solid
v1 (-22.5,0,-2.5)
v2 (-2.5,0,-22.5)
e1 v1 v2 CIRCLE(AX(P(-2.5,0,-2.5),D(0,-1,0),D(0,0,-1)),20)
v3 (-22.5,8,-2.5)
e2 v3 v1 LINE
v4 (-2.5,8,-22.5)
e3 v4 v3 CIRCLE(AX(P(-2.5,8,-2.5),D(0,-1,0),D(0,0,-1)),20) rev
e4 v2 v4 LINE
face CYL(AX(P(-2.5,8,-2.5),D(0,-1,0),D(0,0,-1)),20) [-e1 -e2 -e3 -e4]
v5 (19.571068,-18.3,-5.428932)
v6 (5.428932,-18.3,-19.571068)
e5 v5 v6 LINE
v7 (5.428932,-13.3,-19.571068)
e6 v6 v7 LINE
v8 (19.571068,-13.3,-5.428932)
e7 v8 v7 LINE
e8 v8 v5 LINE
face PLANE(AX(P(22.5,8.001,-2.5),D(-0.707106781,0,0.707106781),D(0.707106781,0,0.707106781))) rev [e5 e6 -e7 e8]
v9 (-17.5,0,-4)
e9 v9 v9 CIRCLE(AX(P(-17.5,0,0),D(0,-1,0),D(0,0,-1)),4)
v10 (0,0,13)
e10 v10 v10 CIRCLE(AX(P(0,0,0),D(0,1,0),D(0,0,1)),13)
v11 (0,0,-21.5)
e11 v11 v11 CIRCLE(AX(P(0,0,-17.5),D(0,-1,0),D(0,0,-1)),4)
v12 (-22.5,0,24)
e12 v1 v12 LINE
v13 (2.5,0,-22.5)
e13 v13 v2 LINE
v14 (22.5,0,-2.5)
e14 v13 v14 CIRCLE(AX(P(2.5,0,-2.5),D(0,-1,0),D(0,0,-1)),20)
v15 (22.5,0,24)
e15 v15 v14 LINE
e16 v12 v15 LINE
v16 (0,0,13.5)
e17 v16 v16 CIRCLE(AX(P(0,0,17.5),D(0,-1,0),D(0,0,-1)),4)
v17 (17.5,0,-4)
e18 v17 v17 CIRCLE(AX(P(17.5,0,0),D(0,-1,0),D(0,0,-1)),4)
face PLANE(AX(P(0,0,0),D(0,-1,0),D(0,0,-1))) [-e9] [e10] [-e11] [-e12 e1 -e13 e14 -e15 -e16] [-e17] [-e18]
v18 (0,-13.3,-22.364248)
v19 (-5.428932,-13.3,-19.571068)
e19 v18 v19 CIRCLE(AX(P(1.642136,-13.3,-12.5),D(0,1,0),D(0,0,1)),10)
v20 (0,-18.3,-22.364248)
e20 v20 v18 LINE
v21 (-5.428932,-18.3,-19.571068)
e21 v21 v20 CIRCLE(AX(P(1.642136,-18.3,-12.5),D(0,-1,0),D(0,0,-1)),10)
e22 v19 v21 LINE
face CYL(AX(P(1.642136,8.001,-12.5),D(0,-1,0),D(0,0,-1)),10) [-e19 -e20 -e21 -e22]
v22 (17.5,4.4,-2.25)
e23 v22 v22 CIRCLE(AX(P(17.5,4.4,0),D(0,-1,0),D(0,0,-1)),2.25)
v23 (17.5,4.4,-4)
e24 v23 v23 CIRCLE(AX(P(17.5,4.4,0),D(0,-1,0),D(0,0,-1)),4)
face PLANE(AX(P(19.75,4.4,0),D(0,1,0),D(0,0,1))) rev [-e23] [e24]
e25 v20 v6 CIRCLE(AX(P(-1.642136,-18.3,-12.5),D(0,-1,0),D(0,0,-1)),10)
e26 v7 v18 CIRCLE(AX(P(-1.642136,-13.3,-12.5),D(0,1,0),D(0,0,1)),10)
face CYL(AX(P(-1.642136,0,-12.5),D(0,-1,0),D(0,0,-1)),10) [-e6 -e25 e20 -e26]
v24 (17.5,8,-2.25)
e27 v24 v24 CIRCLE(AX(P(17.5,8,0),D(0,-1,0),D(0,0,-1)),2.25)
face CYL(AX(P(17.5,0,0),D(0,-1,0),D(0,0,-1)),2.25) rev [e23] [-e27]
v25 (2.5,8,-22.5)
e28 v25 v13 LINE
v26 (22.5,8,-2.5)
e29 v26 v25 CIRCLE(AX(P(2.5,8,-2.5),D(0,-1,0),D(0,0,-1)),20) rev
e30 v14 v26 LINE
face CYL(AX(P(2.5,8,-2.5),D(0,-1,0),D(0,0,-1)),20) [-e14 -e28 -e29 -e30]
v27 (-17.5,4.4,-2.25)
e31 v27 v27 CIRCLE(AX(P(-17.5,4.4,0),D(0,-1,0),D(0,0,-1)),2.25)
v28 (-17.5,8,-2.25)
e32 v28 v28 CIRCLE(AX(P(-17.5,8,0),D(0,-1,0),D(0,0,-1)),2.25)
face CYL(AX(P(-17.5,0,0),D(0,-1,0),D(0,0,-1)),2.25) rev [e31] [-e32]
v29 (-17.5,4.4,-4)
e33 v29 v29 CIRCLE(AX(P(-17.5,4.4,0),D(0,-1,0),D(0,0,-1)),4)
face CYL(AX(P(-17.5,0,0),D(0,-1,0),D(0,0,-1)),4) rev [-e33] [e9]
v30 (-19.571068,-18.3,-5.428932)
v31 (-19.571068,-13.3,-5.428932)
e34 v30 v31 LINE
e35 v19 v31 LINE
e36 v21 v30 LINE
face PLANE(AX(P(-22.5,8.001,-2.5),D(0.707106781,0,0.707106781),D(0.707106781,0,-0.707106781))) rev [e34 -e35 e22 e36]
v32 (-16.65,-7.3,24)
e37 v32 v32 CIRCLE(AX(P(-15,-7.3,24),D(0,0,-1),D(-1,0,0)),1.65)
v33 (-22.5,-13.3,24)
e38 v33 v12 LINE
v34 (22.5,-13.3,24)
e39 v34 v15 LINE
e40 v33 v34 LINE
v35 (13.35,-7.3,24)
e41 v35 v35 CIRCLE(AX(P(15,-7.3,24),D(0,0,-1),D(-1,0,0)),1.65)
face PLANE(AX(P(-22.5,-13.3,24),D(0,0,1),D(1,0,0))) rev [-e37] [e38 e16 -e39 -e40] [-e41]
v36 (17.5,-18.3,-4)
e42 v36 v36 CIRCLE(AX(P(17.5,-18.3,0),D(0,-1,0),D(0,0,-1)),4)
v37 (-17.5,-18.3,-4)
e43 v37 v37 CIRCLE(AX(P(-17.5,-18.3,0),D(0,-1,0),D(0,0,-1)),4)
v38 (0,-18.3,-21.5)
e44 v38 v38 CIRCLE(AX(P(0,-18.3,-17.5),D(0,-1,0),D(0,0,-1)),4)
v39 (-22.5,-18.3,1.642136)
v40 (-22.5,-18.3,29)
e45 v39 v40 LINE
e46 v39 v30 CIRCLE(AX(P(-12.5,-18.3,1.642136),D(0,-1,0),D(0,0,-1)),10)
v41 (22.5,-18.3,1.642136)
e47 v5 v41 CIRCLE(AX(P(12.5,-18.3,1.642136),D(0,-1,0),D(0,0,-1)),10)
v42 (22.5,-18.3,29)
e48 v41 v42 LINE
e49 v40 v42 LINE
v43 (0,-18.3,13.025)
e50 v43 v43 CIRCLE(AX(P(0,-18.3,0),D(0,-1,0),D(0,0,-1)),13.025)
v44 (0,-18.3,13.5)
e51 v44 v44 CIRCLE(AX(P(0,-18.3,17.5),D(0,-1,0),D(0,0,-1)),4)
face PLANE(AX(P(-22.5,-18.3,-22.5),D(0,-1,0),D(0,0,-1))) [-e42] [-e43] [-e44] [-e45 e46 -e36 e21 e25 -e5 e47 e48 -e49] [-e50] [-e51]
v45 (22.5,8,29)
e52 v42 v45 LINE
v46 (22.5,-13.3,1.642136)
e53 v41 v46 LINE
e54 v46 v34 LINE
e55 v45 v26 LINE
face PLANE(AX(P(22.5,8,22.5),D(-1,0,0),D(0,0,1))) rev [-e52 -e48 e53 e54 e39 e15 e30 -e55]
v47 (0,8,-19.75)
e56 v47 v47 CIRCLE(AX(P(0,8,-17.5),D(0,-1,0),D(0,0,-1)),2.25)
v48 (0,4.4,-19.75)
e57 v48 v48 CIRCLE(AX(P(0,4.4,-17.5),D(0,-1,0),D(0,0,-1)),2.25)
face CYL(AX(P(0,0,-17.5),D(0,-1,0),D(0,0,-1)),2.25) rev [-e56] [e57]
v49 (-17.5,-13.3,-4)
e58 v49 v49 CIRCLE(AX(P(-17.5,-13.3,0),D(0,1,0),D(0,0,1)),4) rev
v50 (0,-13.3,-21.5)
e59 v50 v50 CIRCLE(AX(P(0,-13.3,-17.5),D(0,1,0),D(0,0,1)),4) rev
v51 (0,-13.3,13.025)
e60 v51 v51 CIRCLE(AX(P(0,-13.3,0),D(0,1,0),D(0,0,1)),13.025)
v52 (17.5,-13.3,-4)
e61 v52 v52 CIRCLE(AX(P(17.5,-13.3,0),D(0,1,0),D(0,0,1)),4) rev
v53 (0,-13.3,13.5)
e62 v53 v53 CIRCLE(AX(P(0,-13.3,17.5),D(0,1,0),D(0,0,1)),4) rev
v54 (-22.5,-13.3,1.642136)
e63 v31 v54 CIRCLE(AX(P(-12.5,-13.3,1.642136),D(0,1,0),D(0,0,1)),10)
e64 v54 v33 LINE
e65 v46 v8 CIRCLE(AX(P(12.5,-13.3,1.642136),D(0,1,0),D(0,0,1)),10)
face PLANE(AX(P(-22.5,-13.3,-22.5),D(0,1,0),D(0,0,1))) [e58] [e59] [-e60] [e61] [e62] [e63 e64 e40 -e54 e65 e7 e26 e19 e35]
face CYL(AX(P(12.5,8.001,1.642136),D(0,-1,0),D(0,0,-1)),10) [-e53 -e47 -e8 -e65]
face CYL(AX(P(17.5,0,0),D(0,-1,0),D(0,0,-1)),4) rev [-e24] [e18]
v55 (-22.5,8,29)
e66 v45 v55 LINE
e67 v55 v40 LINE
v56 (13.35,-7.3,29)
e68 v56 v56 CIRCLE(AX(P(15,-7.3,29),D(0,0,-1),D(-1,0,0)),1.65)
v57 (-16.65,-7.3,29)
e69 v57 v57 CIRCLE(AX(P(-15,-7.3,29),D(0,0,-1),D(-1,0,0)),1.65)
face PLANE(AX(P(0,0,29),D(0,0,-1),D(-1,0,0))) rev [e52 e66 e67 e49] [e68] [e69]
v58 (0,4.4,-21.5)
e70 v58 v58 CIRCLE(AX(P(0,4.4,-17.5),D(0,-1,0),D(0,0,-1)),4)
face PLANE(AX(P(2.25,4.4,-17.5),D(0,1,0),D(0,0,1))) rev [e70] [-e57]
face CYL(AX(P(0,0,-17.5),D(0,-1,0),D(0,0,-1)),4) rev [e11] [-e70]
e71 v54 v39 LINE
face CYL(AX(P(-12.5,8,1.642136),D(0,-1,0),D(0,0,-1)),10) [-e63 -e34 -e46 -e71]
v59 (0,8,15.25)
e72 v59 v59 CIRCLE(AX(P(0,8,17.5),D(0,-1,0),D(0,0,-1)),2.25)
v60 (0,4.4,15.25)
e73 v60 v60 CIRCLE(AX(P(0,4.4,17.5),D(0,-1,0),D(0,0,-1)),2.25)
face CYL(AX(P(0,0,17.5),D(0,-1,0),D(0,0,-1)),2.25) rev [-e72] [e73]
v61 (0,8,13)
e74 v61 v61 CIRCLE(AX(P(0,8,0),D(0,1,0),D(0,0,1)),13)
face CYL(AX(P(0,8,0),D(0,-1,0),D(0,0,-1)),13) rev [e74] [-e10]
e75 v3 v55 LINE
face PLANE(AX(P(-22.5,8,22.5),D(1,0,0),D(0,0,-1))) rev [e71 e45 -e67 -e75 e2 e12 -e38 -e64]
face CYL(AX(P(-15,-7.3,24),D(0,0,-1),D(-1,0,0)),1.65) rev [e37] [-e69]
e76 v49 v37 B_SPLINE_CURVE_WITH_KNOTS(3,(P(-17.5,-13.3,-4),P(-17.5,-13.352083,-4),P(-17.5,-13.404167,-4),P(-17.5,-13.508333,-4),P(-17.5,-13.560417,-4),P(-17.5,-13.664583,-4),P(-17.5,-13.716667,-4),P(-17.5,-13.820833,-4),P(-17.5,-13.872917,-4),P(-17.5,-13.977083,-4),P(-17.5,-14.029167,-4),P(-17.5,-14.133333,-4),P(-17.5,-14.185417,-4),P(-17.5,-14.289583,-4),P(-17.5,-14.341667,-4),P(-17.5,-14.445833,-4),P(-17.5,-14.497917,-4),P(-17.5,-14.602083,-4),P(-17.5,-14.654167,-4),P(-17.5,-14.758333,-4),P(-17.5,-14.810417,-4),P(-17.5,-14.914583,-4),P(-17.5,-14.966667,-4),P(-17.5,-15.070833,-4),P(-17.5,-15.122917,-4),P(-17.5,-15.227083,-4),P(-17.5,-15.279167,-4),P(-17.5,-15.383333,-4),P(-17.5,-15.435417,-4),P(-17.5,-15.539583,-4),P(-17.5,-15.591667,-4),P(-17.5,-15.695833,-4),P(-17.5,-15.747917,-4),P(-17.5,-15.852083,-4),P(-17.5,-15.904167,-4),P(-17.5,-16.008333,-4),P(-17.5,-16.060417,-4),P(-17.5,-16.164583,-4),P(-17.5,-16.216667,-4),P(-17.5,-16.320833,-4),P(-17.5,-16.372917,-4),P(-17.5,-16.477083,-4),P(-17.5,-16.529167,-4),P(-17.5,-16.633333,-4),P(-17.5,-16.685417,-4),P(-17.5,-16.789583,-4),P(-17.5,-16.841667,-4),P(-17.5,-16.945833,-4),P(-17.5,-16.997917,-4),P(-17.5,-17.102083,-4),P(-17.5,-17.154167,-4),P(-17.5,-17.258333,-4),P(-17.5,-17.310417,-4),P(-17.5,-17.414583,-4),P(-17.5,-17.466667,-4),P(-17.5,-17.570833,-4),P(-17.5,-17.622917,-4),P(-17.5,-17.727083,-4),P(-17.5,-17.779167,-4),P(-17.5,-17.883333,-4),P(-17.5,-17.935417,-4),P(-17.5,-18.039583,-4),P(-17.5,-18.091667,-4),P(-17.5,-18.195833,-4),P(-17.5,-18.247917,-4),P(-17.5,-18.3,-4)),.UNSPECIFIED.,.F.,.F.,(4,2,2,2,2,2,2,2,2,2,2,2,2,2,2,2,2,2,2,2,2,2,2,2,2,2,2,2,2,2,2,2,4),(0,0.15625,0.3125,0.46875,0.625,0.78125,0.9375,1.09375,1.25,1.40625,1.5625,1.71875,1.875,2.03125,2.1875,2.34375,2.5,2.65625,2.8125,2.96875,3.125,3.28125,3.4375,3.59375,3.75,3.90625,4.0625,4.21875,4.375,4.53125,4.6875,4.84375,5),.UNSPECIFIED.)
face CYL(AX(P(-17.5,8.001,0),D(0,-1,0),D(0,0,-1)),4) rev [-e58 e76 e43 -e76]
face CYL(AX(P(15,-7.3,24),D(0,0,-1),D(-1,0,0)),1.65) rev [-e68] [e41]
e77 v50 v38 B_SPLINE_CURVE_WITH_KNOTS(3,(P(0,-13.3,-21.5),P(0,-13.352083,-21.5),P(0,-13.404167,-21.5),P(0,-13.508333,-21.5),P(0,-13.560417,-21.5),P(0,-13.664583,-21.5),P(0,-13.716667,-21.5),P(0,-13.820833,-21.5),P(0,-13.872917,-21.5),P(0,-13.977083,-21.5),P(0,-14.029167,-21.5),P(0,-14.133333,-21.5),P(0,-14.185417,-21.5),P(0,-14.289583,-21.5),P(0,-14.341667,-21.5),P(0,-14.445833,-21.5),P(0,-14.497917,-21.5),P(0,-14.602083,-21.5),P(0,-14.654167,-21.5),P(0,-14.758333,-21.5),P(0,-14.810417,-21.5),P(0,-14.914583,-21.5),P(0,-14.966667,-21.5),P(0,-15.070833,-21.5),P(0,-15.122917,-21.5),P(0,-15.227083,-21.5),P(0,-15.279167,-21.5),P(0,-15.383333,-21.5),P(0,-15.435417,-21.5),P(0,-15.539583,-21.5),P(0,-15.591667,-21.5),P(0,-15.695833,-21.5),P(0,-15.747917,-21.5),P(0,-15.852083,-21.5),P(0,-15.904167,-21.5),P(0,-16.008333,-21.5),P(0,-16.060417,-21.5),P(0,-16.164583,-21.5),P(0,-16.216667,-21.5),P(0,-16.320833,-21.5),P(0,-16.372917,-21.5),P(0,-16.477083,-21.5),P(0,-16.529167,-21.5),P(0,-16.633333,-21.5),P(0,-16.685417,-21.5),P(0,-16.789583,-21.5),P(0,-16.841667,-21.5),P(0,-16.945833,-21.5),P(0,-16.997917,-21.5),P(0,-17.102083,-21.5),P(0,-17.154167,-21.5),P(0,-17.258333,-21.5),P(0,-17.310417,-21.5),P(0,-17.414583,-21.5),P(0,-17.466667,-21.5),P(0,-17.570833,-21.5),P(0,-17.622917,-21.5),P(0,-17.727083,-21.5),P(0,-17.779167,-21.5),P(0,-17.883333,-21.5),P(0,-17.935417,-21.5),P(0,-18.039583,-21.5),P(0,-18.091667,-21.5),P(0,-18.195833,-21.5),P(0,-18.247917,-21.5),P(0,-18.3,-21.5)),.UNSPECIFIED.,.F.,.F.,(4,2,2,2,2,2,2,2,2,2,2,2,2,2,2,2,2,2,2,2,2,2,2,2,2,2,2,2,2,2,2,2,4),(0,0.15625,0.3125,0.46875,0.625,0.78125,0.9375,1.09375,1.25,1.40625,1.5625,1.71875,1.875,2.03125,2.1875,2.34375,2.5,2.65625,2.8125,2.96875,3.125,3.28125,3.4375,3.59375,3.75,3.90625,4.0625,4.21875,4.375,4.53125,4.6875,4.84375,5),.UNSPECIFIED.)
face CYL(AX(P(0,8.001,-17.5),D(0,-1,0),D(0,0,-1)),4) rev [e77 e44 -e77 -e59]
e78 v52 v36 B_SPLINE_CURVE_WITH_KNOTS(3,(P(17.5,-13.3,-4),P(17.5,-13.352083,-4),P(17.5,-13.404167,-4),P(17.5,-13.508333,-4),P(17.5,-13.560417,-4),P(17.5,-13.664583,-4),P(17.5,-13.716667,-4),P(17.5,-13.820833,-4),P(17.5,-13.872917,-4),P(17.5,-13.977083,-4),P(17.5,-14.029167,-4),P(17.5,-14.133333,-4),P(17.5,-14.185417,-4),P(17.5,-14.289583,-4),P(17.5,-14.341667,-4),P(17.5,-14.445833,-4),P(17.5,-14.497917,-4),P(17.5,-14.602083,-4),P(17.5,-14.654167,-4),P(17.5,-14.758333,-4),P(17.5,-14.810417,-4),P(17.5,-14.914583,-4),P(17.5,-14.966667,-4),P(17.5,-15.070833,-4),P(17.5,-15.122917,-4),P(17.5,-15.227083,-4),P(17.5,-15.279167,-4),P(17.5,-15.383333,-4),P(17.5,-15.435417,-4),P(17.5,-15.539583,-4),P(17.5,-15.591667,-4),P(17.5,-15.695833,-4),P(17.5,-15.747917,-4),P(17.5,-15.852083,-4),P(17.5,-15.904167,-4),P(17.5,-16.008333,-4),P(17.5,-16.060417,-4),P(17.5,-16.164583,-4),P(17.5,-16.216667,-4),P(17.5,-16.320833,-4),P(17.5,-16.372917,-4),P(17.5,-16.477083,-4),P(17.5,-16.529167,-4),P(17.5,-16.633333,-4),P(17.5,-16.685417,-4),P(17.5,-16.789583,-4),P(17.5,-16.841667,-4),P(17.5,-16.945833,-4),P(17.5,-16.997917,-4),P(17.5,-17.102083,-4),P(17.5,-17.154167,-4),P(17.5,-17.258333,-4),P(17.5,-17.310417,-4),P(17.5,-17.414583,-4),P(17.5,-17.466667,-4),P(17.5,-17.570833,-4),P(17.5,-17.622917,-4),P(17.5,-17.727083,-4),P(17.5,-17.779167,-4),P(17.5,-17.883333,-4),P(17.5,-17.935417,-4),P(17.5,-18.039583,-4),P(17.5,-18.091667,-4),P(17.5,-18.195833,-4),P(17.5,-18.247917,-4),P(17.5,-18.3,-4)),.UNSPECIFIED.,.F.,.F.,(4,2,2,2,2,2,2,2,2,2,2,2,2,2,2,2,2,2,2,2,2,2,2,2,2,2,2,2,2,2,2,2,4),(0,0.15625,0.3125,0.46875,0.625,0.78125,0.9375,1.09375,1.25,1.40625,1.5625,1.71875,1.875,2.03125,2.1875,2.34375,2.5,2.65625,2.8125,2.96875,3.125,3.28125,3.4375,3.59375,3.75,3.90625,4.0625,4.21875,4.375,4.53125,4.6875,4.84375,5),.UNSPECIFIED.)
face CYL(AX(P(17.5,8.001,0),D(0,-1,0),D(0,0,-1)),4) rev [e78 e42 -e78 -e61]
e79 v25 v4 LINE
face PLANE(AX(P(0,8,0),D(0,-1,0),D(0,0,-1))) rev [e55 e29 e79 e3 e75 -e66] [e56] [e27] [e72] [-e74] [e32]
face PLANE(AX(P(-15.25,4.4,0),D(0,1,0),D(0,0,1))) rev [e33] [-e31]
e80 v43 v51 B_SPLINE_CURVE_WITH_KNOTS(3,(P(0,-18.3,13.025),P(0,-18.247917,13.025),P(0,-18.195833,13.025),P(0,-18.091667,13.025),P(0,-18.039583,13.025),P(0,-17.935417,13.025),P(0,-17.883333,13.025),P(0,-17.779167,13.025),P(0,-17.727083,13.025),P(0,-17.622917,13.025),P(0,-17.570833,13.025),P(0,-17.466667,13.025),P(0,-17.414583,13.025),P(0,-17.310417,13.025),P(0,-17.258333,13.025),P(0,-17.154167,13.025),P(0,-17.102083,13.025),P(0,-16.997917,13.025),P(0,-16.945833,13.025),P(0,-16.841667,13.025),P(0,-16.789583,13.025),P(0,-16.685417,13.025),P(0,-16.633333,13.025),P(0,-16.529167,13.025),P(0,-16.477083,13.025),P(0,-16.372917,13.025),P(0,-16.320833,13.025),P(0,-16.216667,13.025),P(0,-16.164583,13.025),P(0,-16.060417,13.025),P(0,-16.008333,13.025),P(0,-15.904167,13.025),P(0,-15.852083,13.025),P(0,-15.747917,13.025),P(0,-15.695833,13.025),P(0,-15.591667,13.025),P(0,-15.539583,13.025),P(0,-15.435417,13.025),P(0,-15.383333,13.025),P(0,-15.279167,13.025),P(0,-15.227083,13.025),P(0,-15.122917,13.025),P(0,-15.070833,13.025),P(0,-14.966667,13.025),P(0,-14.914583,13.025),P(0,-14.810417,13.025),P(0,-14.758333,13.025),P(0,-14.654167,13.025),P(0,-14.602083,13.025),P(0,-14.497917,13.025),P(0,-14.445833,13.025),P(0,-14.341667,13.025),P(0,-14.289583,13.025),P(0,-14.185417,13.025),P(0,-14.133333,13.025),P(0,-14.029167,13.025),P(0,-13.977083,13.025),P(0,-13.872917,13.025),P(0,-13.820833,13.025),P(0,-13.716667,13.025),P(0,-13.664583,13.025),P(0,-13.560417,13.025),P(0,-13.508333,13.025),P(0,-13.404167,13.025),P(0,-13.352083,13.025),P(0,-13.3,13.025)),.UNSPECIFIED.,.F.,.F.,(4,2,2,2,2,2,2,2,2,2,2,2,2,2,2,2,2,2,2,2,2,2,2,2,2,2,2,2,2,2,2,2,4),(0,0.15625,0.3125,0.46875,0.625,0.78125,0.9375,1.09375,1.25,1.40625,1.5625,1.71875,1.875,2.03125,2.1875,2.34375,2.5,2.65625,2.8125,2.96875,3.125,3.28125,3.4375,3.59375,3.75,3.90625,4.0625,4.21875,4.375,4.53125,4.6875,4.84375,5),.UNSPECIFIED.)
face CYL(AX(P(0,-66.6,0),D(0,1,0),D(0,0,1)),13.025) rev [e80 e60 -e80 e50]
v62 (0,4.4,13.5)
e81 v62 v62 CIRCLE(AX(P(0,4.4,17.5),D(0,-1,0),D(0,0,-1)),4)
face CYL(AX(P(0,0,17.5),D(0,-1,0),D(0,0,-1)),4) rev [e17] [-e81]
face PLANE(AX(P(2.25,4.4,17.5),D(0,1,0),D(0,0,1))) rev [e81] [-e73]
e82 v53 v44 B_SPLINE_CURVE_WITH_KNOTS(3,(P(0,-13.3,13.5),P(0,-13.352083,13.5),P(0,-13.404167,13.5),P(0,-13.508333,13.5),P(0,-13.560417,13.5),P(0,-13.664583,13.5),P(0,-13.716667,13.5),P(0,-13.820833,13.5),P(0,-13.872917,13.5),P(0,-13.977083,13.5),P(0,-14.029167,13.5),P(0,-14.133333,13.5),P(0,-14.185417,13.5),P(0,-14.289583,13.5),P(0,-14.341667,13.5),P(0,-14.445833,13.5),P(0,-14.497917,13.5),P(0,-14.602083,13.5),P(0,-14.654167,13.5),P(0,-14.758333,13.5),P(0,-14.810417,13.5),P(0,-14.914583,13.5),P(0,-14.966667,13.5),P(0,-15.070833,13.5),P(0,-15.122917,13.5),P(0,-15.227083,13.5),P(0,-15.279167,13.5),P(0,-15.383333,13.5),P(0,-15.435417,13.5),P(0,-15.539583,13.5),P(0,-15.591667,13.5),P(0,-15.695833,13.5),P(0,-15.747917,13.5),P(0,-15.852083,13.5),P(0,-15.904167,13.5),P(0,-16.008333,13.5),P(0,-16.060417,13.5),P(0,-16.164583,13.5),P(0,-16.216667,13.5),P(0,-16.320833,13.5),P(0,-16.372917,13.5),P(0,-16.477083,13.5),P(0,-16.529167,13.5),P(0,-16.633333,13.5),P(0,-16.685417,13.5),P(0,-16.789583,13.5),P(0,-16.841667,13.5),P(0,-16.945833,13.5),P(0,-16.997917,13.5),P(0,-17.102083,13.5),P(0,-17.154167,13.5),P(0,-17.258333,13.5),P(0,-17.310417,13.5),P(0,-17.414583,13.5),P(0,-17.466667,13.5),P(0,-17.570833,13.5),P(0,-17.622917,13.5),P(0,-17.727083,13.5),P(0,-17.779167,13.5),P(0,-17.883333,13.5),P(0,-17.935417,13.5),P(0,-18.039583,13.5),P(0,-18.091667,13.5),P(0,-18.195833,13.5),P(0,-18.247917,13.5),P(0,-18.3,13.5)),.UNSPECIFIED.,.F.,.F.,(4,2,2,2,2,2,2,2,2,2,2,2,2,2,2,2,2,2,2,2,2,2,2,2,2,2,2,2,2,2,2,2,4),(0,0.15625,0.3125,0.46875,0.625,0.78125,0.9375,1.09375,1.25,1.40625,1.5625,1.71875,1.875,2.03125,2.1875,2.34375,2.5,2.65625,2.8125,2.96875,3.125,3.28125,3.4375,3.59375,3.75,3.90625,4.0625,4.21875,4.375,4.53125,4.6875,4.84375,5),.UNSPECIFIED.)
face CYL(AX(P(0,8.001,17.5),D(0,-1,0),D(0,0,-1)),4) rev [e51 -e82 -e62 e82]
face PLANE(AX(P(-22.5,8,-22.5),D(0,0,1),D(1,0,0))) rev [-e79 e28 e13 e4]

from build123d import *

# Parameters (mm, degrees)
SKETCH_1_W               = 45
SKETCH_1_H               = 45
SKETCH_1_R               = 13
EXTRUDE_1_DEPTH          = 8
FILLET_1_R               = 20
SKETCH_2_W               = 45
SKETCH_2_H               = 8
EXTRUDE_2_DEPTH          = 6.5
PATTERN_CIRCULAR_1_COUNT = 4
SKETCH_7_W               = 45
SKETCH_7_H               = 5
EXTRUDE_3_DEPTH          = 13.3
SKETCH_9_W               = 45
SKETCH_9_H               = 5
EXTRUDE_4_DEPTH          = 51.5
SKETCH_10_R              = 13.025
CUT_EXTRUDE_1_DEPTH      = 53.3
CUT_EXTRUDE_2_REACH      = 47.155
SKETCH_11_R              = 4
HOLE_WIZARD_M4_1_2_D     = 3.3
HOLE_WIZARD_M4_1_2_DEPTH = 11.5
HOLE_WIZARD_M4_1_2_TIP   = 0.991420021
CUT_EXTRUDE_3_REACH      = 47.155
FILLET_4_R               = 10


with BuildPart() as part:
    # 草图1 → 凸台-拉伸1 (new body)
    with BuildSketch(Plane(origin=(0, 0, 0), x_dir=(1, 0, 0), z_dir=(0, 1, 0))):
        Rectangle(SKETCH_1_W, SKETCH_1_H)
        with Locations(Location((0, 0, 0), (0, 0, 270))):
            Circle(SKETCH_1_R, mode=Mode.SUBTRACT)
    extrude(amount=EXTRUDE_1_DEPTH)

    # 圆角1
    fillet_1_edges = [part.edges().sort_by_distance(p)[0] for p in [
        (-22.5, 4, -22.5),
        (22.5, 4, -22.5),
    ]]
    fillet(fillet_1_edges, radius=FILLET_1_R)

    # 草图2 → 凸台-拉伸2 (add)
    with BuildSketch(Plane.XY.offset(22.5)):
        with Locations((0, 4)):
            Rectangle(SKETCH_2_W, SKETCH_2_H)
    extrude(amount=EXTRUDE_2_DEPTH)

    # 草图6 → Hole Wizard M4 _1 (revolve, cut)
    with BuildSketch(Plane(origin=(0, 0, 17.5), x_dir=(0, 0, -1), z_dir=(1, 0, 0))):
        Polygon((0, 0), (0, 21.351936393), (2.25, 20), (2.25, 4.4), (4, 4.4), (4, 0), align=None)
    hole_wizard_m4_1 = revolve(axis=Axis((0, -6.35, 17.5), (0, 1, 0)), mode=Mode.SUBTRACT)

    # 阵列(圆周)1: Hole Wizard M4 _1 ×4 about axis
    pattern_circular_1_axis = Axis((0, 0, 0), (0, 1, 0))
    for i in range(1, PATTERN_CIRCULAR_1_COUNT):
        add(hole_wizard_m4_1.rotate(pattern_circular_1_axis, i * 360 / PATTERN_CIRCULAR_1_COUNT), mode=Mode.SUBTRACT)

    # 草图7 → 凸台-拉伸3 (add)
    with BuildSketch(Plane.XZ):
        with Locations((0, 26.5)):
            Rectangle(SKETCH_7_W, SKETCH_7_H)
    extrude(amount=EXTRUDE_3_DEPTH)

    # 草图9 → 凸台-拉伸4 (add)
    with BuildSketch(Plane.XY.offset(29)):
        with Locations((0, -15.8)):
            Rectangle(SKETCH_9_W, SKETCH_9_H)
    extrude(amount=-EXTRUDE_4_DEPTH)

    # 草图10 → 切除-拉伸1 (cut)
    with BuildSketch(Plane(origin=(0, -13.3, 0), x_dir=(1, 0, 0), z_dir=(0, 1, 0))):
        with Locations(Location((0, 0, 0), (0, 0, 270))):
            Circle(SKETCH_10_R)
    extrude(amount=-CUT_EXTRUDE_1_DEPTH, mode=Mode.SUBTRACT)

    # 草图11 → 切除-拉伸2 (cut, up to next)
    with BuildSketch(Plane(origin=(0, -18.3, 0), x_dir=(-1, 0, 0), z_dir=(0, -1, 0)), mode=Mode.PRIVATE) as cut_extrude_2_sk1:
        with Locations(Location((0, -17.5, 0), (0, 0, 90))):
            Circle(SKETCH_11_R)
    cut_extrude_2_tool1 = extrude(cut_extrude_2_sk1.sketch, amount=-CUT_EXTRUDE_2_REACH, mode=Mode.PRIVATE) & part.part
    # 草图11 → 切除-拉伸2 (cut, up to next)
    with BuildSketch(Plane(origin=(0, -18.3, 0), x_dir=(-1, 0, 0), z_dir=(0, -1, 0)), mode=Mode.PRIVATE) as cut_extrude_2_sk2:
        with Locations(Location((-17.5, 0, 0), (0, 0, 90))):
            Circle(SKETCH_11_R)
    cut_extrude_2_tool2 = extrude(cut_extrude_2_sk2.sketch, amount=-CUT_EXTRUDE_2_REACH, mode=Mode.PRIVATE) & part.part
    # 草图11 → 切除-拉伸2 (cut, up to next)
    with BuildSketch(Plane(origin=(0, -18.3, 0), x_dir=(-1, 0, 0), z_dir=(0, -1, 0)), mode=Mode.PRIVATE) as cut_extrude_2_sk3:
        with Locations(Location((0, 17.5, 0), (0, 0, 90))):
            Circle(SKETCH_11_R)
    cut_extrude_2_tool3 = extrude(cut_extrude_2_sk3.sketch, amount=-CUT_EXTRUDE_2_REACH, mode=Mode.PRIVATE) & part.part
    # 草图11 → 切除-拉伸2 (cut, up to next)
    with BuildSketch(Plane(origin=(0, -18.3, 0), x_dir=(-1, 0, 0), z_dir=(0, -1, 0)), mode=Mode.PRIVATE) as cut_extrude_2_sk4:
        with Locations(Location((17.5, 0, 0), (0, 0, 90))):
            Circle(SKETCH_11_R)
    cut_extrude_2_tool4 = extrude(cut_extrude_2_sk4.sketch, amount=-CUT_EXTRUDE_2_REACH, mode=Mode.PRIVATE) & part.part
    add(cut_extrude_2_tool1.solids().sort_by_distance((0, -18.3, 17.5))[0], mode=Mode.SUBTRACT)
    add(cut_extrude_2_tool2.solids().sort_by_distance((17.5, -18.3, 0))[0], mode=Mode.SUBTRACT)
    add(cut_extrude_2_tool3.solids().sort_by_distance((0, -18.3, -17.5))[0], mode=Mode.SUBTRACT)
    add(cut_extrude_2_tool4.solids().sort_by_distance((-17.5, -18.3, 0))[0], mode=Mode.SUBTRACT)

    # Hole Wizard M4 _1 2
    with Locations(Plane(origin=(15, -7.3, 24), x_dir=(-1, 0, 0), z_dir=(0, 0, -1))):
        with Locations((0, 0), (30, 0)):
            Hole(HOLE_WIZARD_M4_1_2_D / 2, depth=HOLE_WIZARD_M4_1_2_DEPTH)
            with Locations((0, 0, -(HOLE_WIZARD_M4_1_2_DEPTH + HOLE_WIZARD_M4_1_2_TIP / 2))):  # 118° drill point
                Cone(0, HOLE_WIZARD_M4_1_2_D / 2, HOLE_WIZARD_M4_1_2_TIP, mode=Mode.SUBTRACT)

    # 草图23 → 切除-拉伸3 (cut, up to next)
    with BuildSketch(Plane.XZ.offset(18.3), mode=Mode.PRIVATE) as cut_extrude_3_sk1:
        Polygon((-22.5, -2.5), (-2.5, -22.5), (-22.5, -22.5), align=None)
    cut_extrude_3_tool1 = extrude(cut_extrude_3_sk1.sketch, amount=-CUT_EXTRUDE_3_REACH, mode=Mode.PRIVATE) & part.part
    # 草图23 → 切除-拉伸3 (cut, up to next)
    with BuildSketch(Plane.XZ.offset(18.3), mode=Mode.PRIVATE) as cut_extrude_3_sk2:
        Polygon((22.5, -22.5), (22.5, -2.5), (2.5, -22.5), align=None)
    cut_extrude_3_tool2 = extrude(cut_extrude_3_sk2.sketch, amount=-CUT_EXTRUDE_3_REACH, mode=Mode.PRIVATE) & part.part
    add(cut_extrude_3_tool1.solids().sort_by_distance((-15.833333, -18.3, -15.833333))[0], mode=Mode.SUBTRACT)
    add(cut_extrude_3_tool2.solids().sort_by_distance((15.833333, -18.3, -15.833333))[0], mode=Mode.SUBTRACT)

    # 圆角4
    # the kernel refuses this fillet: 10 mm, written as the material it takes off along each edge
    with BuildSketch(Plane(origin=(-22.5, -28.655339059, -2.5), x_dir=(0, 0, 1), z_dir=(0, 1, 0)), Plane(origin=(-2.5, -28.655339059, -22.5), x_dir=(-0.7071067811865476, 0, 0.7071067811865476), z_dir=(0, 1, 0))) as fillet_4_piece_1:
        with BuildLine():
            CenterArc((FILLET_4_R * 0.414213562373, FILLET_4_R), FILLET_4_R, 225, 45)
            Line((-FILLET_4_R * 0.292893218813, FILLET_4_R * 0.292893218813), (0, 0))
            Line((0, 0), (FILLET_4_R * 0.414213562373, 0))
        make_face()
    extrude(amount=25.710678119, mode=Mode.SUBTRACT)
    with BuildSketch(Plane(origin=(22.5, -28.655339059, -2.5), x_dir=(0, 0, 1), z_dir=(0, 1, 0)), Plane(origin=(2.5, -28.655339059, -22.5), x_dir=(0.7071067811865476, 0, 0.7071067811865476), z_dir=(0, 1, 0))) as fillet_4_piece_2:
        with BuildLine():
            CenterArc((FILLET_4_R * 0.414213562373, -FILLET_4_R), FILLET_4_R, 90, 45)
            Line((-FILLET_4_R * 0.292893218813, -FILLET_4_R * 0.292893218813), (0, 0))
            Line((0, 0), (FILLET_4_R * 0.414213562373, 0))
        make_face()
    extrude(amount=25.710678119, mode=Mode.SUBTRACT)


solid = part.part
